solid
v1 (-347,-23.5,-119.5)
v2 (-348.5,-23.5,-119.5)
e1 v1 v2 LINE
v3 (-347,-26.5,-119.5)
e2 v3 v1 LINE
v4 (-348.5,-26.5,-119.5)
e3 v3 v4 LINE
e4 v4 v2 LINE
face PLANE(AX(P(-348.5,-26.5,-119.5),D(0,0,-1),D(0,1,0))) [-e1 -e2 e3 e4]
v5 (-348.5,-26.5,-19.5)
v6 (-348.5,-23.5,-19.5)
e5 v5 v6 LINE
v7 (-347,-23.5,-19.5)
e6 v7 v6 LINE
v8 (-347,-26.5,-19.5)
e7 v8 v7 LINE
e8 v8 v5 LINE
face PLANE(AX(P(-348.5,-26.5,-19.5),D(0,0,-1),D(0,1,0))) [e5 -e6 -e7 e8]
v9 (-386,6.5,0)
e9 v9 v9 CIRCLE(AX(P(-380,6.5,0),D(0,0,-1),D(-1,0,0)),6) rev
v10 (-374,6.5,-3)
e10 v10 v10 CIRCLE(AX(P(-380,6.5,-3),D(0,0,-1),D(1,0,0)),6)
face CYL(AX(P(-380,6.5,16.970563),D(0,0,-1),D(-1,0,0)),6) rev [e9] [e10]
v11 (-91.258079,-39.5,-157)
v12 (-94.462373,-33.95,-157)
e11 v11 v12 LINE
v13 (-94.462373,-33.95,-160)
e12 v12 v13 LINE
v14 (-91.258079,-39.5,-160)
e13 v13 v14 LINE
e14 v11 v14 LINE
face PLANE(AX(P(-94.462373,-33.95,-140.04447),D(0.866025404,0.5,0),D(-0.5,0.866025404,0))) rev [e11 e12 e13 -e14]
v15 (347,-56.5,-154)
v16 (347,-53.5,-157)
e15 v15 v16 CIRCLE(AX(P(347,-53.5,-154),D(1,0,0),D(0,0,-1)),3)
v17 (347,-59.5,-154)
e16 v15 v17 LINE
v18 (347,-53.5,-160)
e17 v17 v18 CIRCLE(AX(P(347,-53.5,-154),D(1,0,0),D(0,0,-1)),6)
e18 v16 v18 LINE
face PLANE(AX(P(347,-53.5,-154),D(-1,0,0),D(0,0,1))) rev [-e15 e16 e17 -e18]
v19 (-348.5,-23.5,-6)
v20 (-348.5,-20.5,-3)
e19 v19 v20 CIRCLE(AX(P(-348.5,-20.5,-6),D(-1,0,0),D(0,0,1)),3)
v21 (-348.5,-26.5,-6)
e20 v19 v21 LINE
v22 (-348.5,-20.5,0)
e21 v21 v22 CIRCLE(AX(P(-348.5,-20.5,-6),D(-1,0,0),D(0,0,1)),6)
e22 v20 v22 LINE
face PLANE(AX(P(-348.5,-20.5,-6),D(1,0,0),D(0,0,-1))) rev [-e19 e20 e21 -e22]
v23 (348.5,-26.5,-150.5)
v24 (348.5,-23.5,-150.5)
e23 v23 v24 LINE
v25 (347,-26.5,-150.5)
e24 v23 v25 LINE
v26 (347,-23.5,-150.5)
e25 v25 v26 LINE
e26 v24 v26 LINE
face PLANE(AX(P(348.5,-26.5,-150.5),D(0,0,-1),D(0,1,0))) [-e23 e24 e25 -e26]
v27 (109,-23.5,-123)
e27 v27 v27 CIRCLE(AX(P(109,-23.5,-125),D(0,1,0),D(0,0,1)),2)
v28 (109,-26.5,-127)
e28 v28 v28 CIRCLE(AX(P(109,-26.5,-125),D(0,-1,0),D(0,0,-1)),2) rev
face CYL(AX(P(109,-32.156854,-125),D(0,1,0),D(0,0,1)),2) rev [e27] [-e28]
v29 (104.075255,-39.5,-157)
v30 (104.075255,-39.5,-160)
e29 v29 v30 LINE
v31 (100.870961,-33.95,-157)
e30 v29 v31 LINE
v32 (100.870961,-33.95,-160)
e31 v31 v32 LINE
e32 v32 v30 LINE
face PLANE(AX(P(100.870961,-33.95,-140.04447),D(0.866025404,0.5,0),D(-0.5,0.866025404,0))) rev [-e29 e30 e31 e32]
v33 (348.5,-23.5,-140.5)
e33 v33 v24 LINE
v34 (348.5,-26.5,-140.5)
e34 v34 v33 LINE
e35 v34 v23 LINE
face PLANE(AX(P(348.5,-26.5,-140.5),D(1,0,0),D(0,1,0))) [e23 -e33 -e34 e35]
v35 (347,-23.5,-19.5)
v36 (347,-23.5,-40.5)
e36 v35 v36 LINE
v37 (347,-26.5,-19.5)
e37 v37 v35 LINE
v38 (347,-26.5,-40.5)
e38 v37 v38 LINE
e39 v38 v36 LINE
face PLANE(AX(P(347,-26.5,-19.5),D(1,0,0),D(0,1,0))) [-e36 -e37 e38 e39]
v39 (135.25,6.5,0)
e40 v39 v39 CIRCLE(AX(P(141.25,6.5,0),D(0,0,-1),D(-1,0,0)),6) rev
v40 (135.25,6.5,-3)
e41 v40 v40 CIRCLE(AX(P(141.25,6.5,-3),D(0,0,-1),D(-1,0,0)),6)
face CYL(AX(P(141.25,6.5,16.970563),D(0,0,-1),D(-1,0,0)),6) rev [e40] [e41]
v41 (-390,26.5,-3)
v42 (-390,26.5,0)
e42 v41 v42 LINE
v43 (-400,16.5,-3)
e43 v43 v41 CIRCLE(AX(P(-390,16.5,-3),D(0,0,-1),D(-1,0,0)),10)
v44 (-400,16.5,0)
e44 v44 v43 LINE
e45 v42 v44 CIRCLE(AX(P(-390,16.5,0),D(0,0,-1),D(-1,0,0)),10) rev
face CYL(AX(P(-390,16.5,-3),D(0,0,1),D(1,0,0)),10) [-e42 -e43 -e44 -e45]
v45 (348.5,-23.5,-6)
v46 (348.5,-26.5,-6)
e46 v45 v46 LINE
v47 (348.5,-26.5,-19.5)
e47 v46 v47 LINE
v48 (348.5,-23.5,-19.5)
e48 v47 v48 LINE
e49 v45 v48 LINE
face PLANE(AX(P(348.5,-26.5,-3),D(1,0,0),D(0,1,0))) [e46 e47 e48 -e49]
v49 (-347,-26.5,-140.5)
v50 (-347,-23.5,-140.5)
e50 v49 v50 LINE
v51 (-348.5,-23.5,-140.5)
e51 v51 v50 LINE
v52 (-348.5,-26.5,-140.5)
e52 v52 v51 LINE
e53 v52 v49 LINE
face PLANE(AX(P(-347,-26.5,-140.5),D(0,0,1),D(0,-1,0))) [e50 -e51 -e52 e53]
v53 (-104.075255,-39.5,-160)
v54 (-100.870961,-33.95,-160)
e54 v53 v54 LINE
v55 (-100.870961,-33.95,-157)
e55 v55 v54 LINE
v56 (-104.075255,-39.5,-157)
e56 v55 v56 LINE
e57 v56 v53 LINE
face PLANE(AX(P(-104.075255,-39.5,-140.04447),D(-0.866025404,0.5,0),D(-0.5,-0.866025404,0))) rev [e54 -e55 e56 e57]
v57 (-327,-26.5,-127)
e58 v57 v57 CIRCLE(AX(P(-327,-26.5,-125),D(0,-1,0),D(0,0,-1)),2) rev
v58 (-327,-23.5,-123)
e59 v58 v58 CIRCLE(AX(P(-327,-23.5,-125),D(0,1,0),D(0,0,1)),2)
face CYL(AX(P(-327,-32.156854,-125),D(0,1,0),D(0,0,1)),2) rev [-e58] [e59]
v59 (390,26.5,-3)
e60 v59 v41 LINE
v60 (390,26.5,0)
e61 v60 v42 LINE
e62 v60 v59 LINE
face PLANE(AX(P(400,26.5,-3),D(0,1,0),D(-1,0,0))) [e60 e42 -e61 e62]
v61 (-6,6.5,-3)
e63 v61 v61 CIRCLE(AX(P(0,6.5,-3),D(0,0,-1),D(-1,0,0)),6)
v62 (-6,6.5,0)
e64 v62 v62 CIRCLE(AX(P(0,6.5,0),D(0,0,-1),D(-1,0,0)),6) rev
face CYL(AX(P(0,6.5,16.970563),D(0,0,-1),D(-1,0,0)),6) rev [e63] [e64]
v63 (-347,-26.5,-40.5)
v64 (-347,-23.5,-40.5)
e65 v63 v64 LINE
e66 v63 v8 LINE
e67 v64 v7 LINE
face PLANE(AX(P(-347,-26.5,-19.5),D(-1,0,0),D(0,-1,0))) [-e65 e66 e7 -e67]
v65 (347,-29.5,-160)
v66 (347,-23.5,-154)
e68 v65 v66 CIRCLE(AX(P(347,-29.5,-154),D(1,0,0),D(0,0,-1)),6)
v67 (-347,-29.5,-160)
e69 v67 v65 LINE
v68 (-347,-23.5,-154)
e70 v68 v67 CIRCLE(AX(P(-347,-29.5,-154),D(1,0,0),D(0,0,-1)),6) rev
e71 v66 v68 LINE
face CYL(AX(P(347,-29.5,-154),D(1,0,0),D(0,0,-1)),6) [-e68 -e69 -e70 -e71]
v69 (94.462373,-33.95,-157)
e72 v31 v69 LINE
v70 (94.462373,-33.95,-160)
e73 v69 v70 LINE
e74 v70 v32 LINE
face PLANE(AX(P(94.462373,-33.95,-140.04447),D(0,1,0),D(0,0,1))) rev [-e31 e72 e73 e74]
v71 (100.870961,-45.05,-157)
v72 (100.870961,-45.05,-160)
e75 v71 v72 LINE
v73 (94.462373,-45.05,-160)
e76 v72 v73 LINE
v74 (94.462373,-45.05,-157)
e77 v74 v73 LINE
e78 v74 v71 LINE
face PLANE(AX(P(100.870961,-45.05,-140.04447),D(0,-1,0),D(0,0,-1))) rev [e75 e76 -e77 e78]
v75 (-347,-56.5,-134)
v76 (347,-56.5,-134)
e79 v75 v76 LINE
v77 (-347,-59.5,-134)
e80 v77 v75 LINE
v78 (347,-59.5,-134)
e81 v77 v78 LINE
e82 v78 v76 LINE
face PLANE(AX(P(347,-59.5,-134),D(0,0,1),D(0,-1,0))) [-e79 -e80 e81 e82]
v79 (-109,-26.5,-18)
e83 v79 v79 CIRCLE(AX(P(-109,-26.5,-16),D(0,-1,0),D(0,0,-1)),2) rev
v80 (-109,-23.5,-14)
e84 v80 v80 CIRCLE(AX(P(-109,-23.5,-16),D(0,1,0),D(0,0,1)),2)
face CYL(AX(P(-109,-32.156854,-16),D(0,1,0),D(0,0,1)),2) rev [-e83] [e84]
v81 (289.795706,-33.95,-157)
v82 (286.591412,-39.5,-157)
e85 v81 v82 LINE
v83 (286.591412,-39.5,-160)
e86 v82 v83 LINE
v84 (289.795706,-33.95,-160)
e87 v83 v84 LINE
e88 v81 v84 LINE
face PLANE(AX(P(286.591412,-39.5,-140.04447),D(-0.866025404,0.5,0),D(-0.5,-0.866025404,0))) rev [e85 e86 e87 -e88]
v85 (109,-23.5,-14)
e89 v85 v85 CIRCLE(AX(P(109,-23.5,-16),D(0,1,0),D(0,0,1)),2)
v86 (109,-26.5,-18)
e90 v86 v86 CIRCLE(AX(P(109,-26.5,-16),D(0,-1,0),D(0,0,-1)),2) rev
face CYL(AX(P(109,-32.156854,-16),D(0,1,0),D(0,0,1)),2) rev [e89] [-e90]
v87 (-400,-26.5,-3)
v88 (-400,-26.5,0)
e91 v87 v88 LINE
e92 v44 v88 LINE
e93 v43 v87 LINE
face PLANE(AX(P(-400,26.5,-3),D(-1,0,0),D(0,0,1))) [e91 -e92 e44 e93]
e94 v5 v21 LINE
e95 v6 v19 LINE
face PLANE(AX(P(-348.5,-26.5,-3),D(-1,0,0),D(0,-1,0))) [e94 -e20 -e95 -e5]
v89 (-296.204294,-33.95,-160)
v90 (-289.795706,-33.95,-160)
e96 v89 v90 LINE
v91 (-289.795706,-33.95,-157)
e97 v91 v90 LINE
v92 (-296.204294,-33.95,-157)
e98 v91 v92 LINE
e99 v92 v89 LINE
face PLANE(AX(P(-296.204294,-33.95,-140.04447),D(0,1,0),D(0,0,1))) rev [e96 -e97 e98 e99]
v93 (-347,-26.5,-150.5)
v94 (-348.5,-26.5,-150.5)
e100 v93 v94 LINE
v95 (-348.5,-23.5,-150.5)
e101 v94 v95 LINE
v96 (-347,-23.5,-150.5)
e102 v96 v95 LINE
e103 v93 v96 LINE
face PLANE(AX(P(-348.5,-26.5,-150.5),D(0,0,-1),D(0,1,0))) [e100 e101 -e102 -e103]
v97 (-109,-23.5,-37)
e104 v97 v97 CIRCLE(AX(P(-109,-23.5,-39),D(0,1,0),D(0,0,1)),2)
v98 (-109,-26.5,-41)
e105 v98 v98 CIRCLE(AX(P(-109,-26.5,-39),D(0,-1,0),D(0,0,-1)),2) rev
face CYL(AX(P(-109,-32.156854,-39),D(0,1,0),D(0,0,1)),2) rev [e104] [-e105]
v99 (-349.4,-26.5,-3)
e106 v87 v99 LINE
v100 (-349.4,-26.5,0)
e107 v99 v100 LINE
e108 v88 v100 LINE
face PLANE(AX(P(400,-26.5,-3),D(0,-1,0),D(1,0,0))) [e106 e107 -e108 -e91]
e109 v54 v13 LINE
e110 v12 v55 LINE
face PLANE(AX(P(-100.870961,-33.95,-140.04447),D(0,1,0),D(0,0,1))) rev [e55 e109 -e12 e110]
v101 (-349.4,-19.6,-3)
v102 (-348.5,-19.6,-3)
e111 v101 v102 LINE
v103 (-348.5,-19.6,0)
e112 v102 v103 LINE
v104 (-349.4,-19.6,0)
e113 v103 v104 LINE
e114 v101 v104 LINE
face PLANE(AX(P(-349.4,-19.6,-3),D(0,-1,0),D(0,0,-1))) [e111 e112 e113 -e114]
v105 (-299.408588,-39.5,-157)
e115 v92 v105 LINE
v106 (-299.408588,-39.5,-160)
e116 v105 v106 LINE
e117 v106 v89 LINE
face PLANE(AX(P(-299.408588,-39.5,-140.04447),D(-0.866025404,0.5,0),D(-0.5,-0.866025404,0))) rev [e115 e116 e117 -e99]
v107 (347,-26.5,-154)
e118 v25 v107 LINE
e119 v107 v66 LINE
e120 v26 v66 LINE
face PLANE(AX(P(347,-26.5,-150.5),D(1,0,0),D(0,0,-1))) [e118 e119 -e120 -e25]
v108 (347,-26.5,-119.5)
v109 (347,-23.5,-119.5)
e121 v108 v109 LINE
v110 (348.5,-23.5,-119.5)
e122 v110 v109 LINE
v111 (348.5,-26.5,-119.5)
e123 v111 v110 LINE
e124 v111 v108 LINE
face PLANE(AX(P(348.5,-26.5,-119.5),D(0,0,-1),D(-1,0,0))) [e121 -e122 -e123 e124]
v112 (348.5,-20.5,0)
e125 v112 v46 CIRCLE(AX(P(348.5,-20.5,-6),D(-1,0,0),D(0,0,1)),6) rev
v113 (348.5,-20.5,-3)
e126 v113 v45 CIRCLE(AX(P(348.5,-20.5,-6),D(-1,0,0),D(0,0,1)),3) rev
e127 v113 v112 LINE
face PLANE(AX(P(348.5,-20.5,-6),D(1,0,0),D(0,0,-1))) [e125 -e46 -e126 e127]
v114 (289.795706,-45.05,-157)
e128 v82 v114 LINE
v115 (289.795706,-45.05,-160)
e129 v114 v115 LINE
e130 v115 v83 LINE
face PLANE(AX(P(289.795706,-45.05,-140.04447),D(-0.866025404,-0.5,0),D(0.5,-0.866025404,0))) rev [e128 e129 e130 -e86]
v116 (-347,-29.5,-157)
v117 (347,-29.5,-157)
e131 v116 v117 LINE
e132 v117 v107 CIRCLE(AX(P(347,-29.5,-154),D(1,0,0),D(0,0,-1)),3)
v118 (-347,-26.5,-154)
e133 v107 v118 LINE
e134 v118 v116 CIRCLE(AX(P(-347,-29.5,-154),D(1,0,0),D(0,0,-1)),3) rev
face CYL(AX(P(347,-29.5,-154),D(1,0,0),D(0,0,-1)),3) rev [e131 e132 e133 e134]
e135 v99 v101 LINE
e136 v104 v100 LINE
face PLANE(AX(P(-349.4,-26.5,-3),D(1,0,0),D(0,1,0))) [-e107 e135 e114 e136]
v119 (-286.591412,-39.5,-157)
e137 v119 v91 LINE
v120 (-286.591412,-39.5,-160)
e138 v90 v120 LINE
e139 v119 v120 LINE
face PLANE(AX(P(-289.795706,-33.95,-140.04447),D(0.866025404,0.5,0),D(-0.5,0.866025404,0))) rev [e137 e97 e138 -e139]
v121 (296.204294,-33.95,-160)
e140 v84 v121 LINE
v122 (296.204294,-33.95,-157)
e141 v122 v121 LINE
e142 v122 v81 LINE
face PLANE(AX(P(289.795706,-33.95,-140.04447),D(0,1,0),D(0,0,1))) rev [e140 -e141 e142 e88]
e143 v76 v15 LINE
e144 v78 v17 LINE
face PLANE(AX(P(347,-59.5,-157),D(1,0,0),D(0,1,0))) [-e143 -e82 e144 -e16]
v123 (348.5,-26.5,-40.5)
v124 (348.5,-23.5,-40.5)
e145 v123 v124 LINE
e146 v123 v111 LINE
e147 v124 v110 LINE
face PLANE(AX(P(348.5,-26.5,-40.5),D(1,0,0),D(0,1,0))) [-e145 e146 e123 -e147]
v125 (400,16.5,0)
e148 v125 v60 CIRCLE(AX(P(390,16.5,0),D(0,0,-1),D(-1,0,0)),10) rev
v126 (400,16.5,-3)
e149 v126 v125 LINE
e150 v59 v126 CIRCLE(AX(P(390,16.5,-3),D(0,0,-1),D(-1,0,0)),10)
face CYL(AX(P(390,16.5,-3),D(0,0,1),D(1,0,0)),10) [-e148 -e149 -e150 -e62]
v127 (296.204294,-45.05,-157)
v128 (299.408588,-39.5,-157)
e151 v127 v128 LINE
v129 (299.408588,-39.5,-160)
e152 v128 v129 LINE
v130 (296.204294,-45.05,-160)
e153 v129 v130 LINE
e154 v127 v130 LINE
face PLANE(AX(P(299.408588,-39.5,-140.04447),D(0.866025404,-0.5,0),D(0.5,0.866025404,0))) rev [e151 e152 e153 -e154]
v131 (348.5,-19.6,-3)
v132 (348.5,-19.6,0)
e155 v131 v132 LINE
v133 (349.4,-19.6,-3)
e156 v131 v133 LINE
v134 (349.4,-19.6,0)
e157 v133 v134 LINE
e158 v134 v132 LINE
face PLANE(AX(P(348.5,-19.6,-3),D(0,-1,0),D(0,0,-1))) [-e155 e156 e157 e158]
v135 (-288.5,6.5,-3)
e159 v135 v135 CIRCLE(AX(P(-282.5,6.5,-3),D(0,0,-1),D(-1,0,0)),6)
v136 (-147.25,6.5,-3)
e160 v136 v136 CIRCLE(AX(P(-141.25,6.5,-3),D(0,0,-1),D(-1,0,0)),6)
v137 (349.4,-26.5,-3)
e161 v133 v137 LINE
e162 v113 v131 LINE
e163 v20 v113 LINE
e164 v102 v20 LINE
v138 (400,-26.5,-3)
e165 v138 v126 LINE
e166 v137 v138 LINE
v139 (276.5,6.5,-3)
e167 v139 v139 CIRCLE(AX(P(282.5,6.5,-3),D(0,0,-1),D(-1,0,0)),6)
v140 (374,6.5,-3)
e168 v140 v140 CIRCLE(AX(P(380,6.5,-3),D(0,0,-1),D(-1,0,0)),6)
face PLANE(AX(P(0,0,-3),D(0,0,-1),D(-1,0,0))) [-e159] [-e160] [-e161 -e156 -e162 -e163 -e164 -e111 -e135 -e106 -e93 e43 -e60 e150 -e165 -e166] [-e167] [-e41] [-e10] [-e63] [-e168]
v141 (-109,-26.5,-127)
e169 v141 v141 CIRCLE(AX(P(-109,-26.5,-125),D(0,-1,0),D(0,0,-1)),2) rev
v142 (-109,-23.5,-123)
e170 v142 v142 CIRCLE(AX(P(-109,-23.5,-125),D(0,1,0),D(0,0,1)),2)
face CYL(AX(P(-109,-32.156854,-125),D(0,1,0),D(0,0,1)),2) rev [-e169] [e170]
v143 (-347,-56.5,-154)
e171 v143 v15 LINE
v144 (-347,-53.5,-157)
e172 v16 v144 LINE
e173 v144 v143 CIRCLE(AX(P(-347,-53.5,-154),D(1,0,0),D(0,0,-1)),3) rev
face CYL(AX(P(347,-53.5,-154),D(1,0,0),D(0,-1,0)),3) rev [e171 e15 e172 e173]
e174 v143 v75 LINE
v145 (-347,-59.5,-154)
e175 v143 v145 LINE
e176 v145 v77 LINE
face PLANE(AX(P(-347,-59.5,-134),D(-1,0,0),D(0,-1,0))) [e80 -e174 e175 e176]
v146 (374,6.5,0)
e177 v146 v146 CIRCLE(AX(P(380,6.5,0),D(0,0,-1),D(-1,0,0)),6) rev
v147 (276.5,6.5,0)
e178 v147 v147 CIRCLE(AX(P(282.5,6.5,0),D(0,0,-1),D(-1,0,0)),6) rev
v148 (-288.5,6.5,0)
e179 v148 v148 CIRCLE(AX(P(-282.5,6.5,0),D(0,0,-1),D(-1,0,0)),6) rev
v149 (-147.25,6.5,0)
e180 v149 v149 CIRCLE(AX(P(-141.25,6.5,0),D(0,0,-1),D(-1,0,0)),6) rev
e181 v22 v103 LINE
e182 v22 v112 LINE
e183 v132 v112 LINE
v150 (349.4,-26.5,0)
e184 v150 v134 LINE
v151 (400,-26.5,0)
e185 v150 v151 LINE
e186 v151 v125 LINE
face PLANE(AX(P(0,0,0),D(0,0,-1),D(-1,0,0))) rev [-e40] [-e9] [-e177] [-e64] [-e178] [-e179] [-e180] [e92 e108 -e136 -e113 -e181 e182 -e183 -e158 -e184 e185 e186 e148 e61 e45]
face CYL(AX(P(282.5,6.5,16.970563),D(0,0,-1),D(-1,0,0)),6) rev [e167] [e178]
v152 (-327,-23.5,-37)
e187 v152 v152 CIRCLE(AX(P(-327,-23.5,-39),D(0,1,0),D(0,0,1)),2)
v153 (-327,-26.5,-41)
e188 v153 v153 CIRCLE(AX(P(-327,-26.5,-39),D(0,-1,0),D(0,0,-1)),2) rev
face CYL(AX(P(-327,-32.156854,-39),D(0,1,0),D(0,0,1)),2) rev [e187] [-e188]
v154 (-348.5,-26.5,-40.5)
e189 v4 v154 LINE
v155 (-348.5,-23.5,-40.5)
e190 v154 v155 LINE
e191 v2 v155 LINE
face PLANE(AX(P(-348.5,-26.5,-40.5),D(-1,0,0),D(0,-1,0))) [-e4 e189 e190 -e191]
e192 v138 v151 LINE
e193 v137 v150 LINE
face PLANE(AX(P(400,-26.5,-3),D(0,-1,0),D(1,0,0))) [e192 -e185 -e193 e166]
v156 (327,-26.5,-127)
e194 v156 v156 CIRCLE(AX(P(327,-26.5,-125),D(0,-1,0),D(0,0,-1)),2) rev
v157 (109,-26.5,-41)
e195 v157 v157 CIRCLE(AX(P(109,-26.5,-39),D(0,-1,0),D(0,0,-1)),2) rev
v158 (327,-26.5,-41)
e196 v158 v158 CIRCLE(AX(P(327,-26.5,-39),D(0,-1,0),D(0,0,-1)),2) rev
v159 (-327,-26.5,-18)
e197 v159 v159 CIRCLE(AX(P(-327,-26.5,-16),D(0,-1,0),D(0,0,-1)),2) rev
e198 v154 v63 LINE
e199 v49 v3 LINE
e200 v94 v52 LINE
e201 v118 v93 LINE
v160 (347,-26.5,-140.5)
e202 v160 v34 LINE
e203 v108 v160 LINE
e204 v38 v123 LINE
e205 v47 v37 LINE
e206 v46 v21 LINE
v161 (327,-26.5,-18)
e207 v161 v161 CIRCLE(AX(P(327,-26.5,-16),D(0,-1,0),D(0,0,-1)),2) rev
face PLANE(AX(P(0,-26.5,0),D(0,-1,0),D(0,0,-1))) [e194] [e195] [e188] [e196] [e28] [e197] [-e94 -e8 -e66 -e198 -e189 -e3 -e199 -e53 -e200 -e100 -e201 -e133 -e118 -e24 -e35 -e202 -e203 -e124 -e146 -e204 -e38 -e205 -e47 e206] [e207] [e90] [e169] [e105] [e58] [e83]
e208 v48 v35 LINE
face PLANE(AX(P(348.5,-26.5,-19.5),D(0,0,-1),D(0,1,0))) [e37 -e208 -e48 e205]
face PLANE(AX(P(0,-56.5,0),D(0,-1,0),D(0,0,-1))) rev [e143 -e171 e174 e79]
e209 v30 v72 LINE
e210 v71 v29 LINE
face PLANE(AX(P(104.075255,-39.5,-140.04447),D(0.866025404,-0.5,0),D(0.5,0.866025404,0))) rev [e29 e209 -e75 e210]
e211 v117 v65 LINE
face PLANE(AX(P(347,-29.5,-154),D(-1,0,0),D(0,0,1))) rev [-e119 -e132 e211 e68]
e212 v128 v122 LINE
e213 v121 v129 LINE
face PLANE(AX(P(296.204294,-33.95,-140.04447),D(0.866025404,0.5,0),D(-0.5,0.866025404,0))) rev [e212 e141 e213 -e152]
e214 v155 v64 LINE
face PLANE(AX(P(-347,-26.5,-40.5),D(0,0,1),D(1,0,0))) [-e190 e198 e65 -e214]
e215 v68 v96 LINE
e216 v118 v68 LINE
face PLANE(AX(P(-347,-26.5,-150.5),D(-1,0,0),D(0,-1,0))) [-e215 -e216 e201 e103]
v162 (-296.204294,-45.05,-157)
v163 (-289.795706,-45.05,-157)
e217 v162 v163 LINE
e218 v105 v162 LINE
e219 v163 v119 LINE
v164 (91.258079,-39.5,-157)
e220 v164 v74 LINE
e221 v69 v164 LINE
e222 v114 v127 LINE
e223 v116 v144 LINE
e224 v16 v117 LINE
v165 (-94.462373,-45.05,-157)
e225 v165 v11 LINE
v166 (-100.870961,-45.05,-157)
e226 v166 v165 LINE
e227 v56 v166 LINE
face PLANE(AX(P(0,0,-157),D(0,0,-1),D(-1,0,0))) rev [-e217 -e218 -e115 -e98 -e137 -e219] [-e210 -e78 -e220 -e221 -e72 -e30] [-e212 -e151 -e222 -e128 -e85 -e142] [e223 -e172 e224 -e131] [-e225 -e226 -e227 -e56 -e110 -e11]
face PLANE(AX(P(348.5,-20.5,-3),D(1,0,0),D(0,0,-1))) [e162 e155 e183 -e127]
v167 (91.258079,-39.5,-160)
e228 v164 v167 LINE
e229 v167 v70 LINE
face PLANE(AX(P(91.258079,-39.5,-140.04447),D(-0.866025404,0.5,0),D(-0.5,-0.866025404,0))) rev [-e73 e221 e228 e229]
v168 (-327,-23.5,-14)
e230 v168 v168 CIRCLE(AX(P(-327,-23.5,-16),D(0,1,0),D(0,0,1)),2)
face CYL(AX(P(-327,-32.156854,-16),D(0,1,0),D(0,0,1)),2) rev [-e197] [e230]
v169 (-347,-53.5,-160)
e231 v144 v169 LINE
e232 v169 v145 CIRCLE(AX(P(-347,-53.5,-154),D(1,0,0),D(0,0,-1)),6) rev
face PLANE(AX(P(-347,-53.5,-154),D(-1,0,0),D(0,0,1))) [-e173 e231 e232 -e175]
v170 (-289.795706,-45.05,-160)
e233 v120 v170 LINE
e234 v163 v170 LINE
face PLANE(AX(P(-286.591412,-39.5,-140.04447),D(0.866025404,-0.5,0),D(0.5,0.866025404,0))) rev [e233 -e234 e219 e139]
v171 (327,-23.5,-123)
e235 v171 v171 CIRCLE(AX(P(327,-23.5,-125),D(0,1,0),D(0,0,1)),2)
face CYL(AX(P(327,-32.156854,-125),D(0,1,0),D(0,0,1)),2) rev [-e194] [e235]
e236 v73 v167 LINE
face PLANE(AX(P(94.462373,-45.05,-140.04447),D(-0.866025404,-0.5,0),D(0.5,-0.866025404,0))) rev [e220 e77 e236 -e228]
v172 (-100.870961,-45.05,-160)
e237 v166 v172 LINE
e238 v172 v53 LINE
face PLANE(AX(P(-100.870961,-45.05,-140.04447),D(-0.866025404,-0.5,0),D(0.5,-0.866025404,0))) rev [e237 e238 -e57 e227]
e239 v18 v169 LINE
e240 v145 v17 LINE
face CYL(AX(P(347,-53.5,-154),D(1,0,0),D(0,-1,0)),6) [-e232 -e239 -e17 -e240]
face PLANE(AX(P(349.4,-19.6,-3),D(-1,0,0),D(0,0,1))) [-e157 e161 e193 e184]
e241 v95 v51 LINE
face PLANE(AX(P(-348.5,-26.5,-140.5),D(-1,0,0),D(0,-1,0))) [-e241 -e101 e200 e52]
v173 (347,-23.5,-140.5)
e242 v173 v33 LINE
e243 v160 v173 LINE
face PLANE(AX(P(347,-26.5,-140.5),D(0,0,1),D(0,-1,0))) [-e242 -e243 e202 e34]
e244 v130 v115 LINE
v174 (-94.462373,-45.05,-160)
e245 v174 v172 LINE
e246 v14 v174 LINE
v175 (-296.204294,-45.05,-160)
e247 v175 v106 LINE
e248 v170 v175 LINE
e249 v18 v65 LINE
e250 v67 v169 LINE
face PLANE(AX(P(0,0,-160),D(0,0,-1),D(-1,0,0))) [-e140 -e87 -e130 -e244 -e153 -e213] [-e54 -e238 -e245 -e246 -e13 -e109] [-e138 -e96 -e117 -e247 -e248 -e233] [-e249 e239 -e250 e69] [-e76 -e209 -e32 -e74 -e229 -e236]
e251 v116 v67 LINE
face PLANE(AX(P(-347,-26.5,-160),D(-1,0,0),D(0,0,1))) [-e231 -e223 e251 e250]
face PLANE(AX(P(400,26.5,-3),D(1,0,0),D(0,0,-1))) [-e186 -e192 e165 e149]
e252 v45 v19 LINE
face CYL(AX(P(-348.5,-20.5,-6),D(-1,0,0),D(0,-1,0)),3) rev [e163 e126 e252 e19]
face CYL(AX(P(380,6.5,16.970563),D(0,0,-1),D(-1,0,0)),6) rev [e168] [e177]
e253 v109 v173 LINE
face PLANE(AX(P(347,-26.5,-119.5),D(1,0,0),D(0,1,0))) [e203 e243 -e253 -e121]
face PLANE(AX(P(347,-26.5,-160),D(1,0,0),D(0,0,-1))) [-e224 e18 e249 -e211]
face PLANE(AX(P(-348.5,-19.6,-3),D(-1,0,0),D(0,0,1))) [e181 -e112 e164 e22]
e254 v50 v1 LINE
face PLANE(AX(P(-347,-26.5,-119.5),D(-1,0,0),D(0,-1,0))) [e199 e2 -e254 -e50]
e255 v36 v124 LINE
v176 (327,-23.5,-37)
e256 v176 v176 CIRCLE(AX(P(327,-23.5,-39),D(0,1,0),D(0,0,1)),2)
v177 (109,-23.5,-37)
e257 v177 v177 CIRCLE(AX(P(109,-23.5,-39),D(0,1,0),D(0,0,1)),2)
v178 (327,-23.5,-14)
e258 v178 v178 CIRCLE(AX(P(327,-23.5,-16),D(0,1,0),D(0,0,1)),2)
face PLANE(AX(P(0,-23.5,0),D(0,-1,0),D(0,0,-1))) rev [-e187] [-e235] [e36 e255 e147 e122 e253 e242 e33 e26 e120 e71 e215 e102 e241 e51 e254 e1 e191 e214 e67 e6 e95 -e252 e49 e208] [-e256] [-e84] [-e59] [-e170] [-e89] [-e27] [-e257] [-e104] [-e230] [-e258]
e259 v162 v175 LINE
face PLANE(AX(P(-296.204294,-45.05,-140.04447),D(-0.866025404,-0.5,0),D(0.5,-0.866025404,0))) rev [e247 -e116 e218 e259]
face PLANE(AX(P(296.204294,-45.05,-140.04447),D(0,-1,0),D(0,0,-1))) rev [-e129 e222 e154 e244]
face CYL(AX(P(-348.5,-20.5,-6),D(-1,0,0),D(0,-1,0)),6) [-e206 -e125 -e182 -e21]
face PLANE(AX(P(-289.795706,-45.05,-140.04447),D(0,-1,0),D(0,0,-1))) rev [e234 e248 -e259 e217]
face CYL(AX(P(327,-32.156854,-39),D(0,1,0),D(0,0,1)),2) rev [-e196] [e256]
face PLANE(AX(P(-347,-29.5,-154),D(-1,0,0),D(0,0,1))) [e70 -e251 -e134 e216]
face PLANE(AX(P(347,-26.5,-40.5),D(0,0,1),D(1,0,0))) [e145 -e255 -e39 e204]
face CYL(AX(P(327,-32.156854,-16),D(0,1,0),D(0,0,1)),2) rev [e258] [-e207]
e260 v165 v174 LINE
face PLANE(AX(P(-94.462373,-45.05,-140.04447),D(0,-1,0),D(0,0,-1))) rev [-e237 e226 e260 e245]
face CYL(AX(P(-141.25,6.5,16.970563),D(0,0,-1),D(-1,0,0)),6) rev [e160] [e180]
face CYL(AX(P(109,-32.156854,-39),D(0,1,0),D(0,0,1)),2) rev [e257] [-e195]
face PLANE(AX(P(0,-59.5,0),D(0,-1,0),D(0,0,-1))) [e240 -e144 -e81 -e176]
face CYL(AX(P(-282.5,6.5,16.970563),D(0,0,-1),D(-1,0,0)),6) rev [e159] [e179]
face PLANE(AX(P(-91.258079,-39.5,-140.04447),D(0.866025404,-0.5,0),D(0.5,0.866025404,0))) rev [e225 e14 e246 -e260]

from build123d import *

# Parameters (mm, degrees)
SKETCH2_W                     = 800
SKETCH2_H                     = 53
BASE_FLANGE1_DEPTH            = 3
EDGE_FLANGE1_STRIP_W          = 18
EDGE_FLANGE1_STRIP_H          = 3
EDGE_FLANGE1_STRIP_CUT_DEPTH  = 697
EDGE_FLANGE1_RELIEF_W         = 18.9
EDGE_FLANGE1_RELIEF_H         = 0.9
EDGE_FLANGE1_RELIEF_CUT_DEPTH = 3
EDGE_FLANGE1_DEPTH            = 697
EDGE_FLANGE1_FLAT_DEPTH       = 3
EDGE_FLANGE2_STRIP_W          = 18
EDGE_FLANGE2_STRIP_H          = 3
EDGE_FLANGE2_STRIP_CUT_DEPTH  = 694
EDGE_FLANGE2_DEPTH            = 694
EDGE_FLANGE3_STRIP_W          = 18
EDGE_FLANGE3_STRIP_H          = 3
EDGE_FLANGE3_STRIP_CUT_DEPTH  = 694
EDGE_FLANGE3_DEPTH            = 694
FILLET1_R                     = 10
CUT_EXTRUDE2_DEPTH            = 3
LPATTERN1_COUNT               = 4
LPATTERN1_PITCH               = 195.333333333
SKETCH20_R                    = 6
CUT_EXTRUDE3_DEPTH            = 3
SKETCH21_R                    = 6
CUT_EXTRUDE4_DEPTH            = 3
LPATTERN2_COUNT               = 5
LPATTERN2_PITCH               = 141.25
SKETCH22_R                    = 2
CUT_EXTRUDE5_DEPTH            = 3
LPATTERN3_COUNT               = 4
LPATTERN3_PITCH               = 218


# Sheet-metal steps are written as plain solids
with BuildPart() as part:
    # Sketch2 → Base-Flange1 (new body)
    with BuildSketch(Plane.XY):
        Rectangle(SKETCH2_W, SKETCH2_H)
    extrude(amount=-BASE_FLANGE1_DEPTH)

    # Edge-Flange1 strip (across the edge) → Edge-Flange1 strip cut (cut)
    with BuildSketch(Plane(origin=(348.5, -26.5, -3), x_dir=(0, 1, 0), z_dir=(-1, 0, 0))):
        with Locations((-3, -1.5)):
            Rectangle(EDGE_FLANGE1_STRIP_W, EDGE_FLANGE1_STRIP_H)
    extrude(amount=EDGE_FLANGE1_STRIP_CUT_DEPTH, mode=Mode.SUBTRACT)

    # Edge-Flange1 relief (on the sheet) → Edge-Flange1 relief cut (cut)
    with BuildSketch(Plane(origin=(348.5, -20.5, -3), x_dir=(0, 1, 0), z_dir=(0, 0, -1))):
        with Locations((-8.55, 0.45)):
            Rectangle(EDGE_FLANGE1_RELIEF_W, EDGE_FLANGE1_RELIEF_H)
        with Locations((-8.55, -697.45)):
            Rectangle(EDGE_FLANGE1_RELIEF_W, EDGE_FLANGE1_RELIEF_H)
    extrude(amount=-EDGE_FLANGE1_RELIEF_CUT_DEPTH, mode=Mode.SUBTRACT)

    # Edge-Flange1 bend section (across the edge) → Edge-Flange1 (add)
    with BuildSketch(Plane(origin=(348.5, -26.5, -3), x_dir=(0, 1, 0), z_dir=(-1, 0, 0))):
        with BuildLine():
            Line((0, 3), (3, 3))
            ThreePointArc((3, 3), (3.878679656, 0.878679656), (6, 0))
            Line((6, 0), (6, -3))
            ThreePointArc((6, -3), (1.757359313, -1.242640687), (0, 3))
        make_face()
    extrude(amount=EDGE_FLANGE1_DEPTH)

    # Edge-Flange1 profile (on flange) → Edge-Flange1 flat (add)
    with BuildSketch(Plane(origin=(0, -26.5, -3), x_dir=(1, 0, 0), z_dir=(0, 1, 0))):
        Polygon((-348.5, 16.5), (-348.5, 3), (348.5, 3), (348.5, 16.5), (347, 16.5), (347, 37.5), (348.5, 37.5), (348.5, 116.5), (347, 116.5), (347, 137.5), (348.5, 137.5), (348.5, 147.5), (347, 147.5), (347, 157), (-347, 157), (-347, 147.5), (-348.5, 147.5), (-348.5, 137.5), (-347, 137.5), (-347, 116.5), (-348.5, 116.5), (-348.5, 37.5), (-347, 37.5), (-347, 16.5), align=None)
    extrude(amount=EDGE_FLANGE1_FLAT_DEPTH)

    # Edge-Flange2 strip (across the edge) → Edge-Flange2 strip cut (cut)
    with BuildSketch(Plane(origin=(-347, -26.5, -160), x_dir=(0, 0, 1), z_dir=(1, 0, 0))):
        with Locations((-3, -1.5)):
            Rectangle(EDGE_FLANGE2_STRIP_W, EDGE_FLANGE2_STRIP_H)
    extrude(amount=EDGE_FLANGE2_STRIP_CUT_DEPTH, mode=Mode.SUBTRACT)

    # Edge-Flange2 section (across the edge) → Edge-Flange2 (add)
    with BuildSketch(Plane(origin=(-347, -26.5, -160), x_dir=(0, 0, 1), z_dir=(1, 0, 0))):
        with BuildLine():
            Line((0, 3), (0, 33))
            Line((0, 33), (3, 33))
            Line((3, 33), (3, 3))
            ThreePointArc((3, 3), (3.878679656, 0.878679656), (6, 0))
            Line((6, 0), (6, -3))
            ThreePointArc((6, -3), (1.757359313, -1.242640687), (0, 3))
        make_face()
    extrude(amount=EDGE_FLANGE2_DEPTH)

    # Edge-Flange3 strip (across the edge) → Edge-Flange3 strip cut (cut)
    with BuildSketch(Plane(origin=(-347, -59.5, -157), x_dir=(0, 1, 0), z_dir=(1, 0, 0))):
        with Locations((-3, -1.5)):
            Rectangle(EDGE_FLANGE3_STRIP_W, EDGE_FLANGE3_STRIP_H)
    extrude(amount=EDGE_FLANGE3_STRIP_CUT_DEPTH, mode=Mode.SUBTRACT)

    # Edge-Flange3 section (across the edge) → Edge-Flange3 (add)
    with BuildSketch(Plane(origin=(-347, -59.5, -157), x_dir=(0, 1, 0), z_dir=(1, 0, 0))):
        with BuildLine():
            Line((0, 3), (0, 23))
            Line((0, 23), (3, 23))
            Line((3, 23), (3, 3))
            ThreePointArc((3, 3), (3.878679656, 0.878679656), (6, 0))
            Line((6, 0), (6, -3))
            ThreePointArc((6, -3), (1.757359313, -1.242640687), (0, 3))
        make_face()
    extrude(amount=EDGE_FLANGE3_DEPTH)

    # Fillet1
    fillet1_edges = [part.edges().sort_by_distance(p)[0] for p in [
        (-400, 26.5, -1.5),
        (400, 26.5, -1.5),
    ]]
    fillet(fillet1_edges, radius=FILLET1_R)

    # Sketch19 → Cut-Extrude2 (cut)
    with BuildSketch(Plane(origin=(0, 0, -160), x_dir=(-1, 0, 0), z_dir=(0, 0, -1))):
        Polygon((-286.591412012, -39.5), (-289.795706006, -33.95), (-296.204293994, -33.95), (-299.408587988, -39.5), (-296.204293994, -45.05), (-289.795706006, -45.05), align=None)
    cut_extrude2 = extrude(amount=-CUT_EXTRUDE2_DEPTH, mode=Mode.SUBTRACT)

    # LPattern1: Cut-Extrude2 ×4
    with Locations(*[(-i * LPATTERN1_PITCH, 0, 0) for i in range(1, LPATTERN1_COUNT)]):
        add(cut_extrude2, mode=Mode.SUBTRACT)

    # Sketch20 → Cut-Extrude3 (cut)
    with BuildSketch(Plane(origin=(0, 0, -3), x_dir=(-1, 0, 0), z_dir=(0, 0, -1))):
        with Locations((-380, 6.5)):
            Circle(SKETCH20_R)
        with Locations((380, 6.5)):
            Circle(SKETCH20_R)
    extrude(amount=-CUT_EXTRUDE3_DEPTH, mode=Mode.SUBTRACT)

    # Sketch21 → Cut-Extrude4 (cut)
    with BuildSketch(Plane(origin=(0, 0, -3), x_dir=(-1, 0, 0), z_dir=(0, 0, -1))):
        with Locations((-282.5, 6.5)):
            Circle(SKETCH21_R)
    cut_extrude4 = extrude(amount=-CUT_EXTRUDE4_DEPTH, mode=Mode.SUBTRACT)

    # LPattern2: Cut-Extrude4 ×5
    with Locations(*[(-i * LPATTERN2_PITCH, 0, 0) for i in range(1, LPATTERN2_COUNT)]):
        add(cut_extrude4, mode=Mode.SUBTRACT)

    # Sketch22 → Cut-Extrude5 (cut)
    with BuildSketch(Plane(origin=(0, -23.5, 0), x_dir=(1, 0, 0), z_dir=(0, 1, 0))):
        with Locations(Location((-327, 16, 0), (0, 0, 270))):
            Circle(SKETCH22_R)
        with Locations(Location((-327, 39, 0), (0, 0, 270))):
            Circle(SKETCH22_R)
        with Locations(Location((-327, 125, 0), (0, 0, 270))):
            Circle(SKETCH22_R)
    cut_extrude5 = extrude(amount=-CUT_EXTRUDE5_DEPTH, mode=Mode.SUBTRACT)

    # LPattern3: Cut-Extrude5 ×4
    with Locations(*[(i * LPATTERN3_PITCH, 0, 0) for i in range(1, LPATTERN3_COUNT)]):
        add(cut_extrude5, mode=Mode.SUBTRACT)


solid = part.part
